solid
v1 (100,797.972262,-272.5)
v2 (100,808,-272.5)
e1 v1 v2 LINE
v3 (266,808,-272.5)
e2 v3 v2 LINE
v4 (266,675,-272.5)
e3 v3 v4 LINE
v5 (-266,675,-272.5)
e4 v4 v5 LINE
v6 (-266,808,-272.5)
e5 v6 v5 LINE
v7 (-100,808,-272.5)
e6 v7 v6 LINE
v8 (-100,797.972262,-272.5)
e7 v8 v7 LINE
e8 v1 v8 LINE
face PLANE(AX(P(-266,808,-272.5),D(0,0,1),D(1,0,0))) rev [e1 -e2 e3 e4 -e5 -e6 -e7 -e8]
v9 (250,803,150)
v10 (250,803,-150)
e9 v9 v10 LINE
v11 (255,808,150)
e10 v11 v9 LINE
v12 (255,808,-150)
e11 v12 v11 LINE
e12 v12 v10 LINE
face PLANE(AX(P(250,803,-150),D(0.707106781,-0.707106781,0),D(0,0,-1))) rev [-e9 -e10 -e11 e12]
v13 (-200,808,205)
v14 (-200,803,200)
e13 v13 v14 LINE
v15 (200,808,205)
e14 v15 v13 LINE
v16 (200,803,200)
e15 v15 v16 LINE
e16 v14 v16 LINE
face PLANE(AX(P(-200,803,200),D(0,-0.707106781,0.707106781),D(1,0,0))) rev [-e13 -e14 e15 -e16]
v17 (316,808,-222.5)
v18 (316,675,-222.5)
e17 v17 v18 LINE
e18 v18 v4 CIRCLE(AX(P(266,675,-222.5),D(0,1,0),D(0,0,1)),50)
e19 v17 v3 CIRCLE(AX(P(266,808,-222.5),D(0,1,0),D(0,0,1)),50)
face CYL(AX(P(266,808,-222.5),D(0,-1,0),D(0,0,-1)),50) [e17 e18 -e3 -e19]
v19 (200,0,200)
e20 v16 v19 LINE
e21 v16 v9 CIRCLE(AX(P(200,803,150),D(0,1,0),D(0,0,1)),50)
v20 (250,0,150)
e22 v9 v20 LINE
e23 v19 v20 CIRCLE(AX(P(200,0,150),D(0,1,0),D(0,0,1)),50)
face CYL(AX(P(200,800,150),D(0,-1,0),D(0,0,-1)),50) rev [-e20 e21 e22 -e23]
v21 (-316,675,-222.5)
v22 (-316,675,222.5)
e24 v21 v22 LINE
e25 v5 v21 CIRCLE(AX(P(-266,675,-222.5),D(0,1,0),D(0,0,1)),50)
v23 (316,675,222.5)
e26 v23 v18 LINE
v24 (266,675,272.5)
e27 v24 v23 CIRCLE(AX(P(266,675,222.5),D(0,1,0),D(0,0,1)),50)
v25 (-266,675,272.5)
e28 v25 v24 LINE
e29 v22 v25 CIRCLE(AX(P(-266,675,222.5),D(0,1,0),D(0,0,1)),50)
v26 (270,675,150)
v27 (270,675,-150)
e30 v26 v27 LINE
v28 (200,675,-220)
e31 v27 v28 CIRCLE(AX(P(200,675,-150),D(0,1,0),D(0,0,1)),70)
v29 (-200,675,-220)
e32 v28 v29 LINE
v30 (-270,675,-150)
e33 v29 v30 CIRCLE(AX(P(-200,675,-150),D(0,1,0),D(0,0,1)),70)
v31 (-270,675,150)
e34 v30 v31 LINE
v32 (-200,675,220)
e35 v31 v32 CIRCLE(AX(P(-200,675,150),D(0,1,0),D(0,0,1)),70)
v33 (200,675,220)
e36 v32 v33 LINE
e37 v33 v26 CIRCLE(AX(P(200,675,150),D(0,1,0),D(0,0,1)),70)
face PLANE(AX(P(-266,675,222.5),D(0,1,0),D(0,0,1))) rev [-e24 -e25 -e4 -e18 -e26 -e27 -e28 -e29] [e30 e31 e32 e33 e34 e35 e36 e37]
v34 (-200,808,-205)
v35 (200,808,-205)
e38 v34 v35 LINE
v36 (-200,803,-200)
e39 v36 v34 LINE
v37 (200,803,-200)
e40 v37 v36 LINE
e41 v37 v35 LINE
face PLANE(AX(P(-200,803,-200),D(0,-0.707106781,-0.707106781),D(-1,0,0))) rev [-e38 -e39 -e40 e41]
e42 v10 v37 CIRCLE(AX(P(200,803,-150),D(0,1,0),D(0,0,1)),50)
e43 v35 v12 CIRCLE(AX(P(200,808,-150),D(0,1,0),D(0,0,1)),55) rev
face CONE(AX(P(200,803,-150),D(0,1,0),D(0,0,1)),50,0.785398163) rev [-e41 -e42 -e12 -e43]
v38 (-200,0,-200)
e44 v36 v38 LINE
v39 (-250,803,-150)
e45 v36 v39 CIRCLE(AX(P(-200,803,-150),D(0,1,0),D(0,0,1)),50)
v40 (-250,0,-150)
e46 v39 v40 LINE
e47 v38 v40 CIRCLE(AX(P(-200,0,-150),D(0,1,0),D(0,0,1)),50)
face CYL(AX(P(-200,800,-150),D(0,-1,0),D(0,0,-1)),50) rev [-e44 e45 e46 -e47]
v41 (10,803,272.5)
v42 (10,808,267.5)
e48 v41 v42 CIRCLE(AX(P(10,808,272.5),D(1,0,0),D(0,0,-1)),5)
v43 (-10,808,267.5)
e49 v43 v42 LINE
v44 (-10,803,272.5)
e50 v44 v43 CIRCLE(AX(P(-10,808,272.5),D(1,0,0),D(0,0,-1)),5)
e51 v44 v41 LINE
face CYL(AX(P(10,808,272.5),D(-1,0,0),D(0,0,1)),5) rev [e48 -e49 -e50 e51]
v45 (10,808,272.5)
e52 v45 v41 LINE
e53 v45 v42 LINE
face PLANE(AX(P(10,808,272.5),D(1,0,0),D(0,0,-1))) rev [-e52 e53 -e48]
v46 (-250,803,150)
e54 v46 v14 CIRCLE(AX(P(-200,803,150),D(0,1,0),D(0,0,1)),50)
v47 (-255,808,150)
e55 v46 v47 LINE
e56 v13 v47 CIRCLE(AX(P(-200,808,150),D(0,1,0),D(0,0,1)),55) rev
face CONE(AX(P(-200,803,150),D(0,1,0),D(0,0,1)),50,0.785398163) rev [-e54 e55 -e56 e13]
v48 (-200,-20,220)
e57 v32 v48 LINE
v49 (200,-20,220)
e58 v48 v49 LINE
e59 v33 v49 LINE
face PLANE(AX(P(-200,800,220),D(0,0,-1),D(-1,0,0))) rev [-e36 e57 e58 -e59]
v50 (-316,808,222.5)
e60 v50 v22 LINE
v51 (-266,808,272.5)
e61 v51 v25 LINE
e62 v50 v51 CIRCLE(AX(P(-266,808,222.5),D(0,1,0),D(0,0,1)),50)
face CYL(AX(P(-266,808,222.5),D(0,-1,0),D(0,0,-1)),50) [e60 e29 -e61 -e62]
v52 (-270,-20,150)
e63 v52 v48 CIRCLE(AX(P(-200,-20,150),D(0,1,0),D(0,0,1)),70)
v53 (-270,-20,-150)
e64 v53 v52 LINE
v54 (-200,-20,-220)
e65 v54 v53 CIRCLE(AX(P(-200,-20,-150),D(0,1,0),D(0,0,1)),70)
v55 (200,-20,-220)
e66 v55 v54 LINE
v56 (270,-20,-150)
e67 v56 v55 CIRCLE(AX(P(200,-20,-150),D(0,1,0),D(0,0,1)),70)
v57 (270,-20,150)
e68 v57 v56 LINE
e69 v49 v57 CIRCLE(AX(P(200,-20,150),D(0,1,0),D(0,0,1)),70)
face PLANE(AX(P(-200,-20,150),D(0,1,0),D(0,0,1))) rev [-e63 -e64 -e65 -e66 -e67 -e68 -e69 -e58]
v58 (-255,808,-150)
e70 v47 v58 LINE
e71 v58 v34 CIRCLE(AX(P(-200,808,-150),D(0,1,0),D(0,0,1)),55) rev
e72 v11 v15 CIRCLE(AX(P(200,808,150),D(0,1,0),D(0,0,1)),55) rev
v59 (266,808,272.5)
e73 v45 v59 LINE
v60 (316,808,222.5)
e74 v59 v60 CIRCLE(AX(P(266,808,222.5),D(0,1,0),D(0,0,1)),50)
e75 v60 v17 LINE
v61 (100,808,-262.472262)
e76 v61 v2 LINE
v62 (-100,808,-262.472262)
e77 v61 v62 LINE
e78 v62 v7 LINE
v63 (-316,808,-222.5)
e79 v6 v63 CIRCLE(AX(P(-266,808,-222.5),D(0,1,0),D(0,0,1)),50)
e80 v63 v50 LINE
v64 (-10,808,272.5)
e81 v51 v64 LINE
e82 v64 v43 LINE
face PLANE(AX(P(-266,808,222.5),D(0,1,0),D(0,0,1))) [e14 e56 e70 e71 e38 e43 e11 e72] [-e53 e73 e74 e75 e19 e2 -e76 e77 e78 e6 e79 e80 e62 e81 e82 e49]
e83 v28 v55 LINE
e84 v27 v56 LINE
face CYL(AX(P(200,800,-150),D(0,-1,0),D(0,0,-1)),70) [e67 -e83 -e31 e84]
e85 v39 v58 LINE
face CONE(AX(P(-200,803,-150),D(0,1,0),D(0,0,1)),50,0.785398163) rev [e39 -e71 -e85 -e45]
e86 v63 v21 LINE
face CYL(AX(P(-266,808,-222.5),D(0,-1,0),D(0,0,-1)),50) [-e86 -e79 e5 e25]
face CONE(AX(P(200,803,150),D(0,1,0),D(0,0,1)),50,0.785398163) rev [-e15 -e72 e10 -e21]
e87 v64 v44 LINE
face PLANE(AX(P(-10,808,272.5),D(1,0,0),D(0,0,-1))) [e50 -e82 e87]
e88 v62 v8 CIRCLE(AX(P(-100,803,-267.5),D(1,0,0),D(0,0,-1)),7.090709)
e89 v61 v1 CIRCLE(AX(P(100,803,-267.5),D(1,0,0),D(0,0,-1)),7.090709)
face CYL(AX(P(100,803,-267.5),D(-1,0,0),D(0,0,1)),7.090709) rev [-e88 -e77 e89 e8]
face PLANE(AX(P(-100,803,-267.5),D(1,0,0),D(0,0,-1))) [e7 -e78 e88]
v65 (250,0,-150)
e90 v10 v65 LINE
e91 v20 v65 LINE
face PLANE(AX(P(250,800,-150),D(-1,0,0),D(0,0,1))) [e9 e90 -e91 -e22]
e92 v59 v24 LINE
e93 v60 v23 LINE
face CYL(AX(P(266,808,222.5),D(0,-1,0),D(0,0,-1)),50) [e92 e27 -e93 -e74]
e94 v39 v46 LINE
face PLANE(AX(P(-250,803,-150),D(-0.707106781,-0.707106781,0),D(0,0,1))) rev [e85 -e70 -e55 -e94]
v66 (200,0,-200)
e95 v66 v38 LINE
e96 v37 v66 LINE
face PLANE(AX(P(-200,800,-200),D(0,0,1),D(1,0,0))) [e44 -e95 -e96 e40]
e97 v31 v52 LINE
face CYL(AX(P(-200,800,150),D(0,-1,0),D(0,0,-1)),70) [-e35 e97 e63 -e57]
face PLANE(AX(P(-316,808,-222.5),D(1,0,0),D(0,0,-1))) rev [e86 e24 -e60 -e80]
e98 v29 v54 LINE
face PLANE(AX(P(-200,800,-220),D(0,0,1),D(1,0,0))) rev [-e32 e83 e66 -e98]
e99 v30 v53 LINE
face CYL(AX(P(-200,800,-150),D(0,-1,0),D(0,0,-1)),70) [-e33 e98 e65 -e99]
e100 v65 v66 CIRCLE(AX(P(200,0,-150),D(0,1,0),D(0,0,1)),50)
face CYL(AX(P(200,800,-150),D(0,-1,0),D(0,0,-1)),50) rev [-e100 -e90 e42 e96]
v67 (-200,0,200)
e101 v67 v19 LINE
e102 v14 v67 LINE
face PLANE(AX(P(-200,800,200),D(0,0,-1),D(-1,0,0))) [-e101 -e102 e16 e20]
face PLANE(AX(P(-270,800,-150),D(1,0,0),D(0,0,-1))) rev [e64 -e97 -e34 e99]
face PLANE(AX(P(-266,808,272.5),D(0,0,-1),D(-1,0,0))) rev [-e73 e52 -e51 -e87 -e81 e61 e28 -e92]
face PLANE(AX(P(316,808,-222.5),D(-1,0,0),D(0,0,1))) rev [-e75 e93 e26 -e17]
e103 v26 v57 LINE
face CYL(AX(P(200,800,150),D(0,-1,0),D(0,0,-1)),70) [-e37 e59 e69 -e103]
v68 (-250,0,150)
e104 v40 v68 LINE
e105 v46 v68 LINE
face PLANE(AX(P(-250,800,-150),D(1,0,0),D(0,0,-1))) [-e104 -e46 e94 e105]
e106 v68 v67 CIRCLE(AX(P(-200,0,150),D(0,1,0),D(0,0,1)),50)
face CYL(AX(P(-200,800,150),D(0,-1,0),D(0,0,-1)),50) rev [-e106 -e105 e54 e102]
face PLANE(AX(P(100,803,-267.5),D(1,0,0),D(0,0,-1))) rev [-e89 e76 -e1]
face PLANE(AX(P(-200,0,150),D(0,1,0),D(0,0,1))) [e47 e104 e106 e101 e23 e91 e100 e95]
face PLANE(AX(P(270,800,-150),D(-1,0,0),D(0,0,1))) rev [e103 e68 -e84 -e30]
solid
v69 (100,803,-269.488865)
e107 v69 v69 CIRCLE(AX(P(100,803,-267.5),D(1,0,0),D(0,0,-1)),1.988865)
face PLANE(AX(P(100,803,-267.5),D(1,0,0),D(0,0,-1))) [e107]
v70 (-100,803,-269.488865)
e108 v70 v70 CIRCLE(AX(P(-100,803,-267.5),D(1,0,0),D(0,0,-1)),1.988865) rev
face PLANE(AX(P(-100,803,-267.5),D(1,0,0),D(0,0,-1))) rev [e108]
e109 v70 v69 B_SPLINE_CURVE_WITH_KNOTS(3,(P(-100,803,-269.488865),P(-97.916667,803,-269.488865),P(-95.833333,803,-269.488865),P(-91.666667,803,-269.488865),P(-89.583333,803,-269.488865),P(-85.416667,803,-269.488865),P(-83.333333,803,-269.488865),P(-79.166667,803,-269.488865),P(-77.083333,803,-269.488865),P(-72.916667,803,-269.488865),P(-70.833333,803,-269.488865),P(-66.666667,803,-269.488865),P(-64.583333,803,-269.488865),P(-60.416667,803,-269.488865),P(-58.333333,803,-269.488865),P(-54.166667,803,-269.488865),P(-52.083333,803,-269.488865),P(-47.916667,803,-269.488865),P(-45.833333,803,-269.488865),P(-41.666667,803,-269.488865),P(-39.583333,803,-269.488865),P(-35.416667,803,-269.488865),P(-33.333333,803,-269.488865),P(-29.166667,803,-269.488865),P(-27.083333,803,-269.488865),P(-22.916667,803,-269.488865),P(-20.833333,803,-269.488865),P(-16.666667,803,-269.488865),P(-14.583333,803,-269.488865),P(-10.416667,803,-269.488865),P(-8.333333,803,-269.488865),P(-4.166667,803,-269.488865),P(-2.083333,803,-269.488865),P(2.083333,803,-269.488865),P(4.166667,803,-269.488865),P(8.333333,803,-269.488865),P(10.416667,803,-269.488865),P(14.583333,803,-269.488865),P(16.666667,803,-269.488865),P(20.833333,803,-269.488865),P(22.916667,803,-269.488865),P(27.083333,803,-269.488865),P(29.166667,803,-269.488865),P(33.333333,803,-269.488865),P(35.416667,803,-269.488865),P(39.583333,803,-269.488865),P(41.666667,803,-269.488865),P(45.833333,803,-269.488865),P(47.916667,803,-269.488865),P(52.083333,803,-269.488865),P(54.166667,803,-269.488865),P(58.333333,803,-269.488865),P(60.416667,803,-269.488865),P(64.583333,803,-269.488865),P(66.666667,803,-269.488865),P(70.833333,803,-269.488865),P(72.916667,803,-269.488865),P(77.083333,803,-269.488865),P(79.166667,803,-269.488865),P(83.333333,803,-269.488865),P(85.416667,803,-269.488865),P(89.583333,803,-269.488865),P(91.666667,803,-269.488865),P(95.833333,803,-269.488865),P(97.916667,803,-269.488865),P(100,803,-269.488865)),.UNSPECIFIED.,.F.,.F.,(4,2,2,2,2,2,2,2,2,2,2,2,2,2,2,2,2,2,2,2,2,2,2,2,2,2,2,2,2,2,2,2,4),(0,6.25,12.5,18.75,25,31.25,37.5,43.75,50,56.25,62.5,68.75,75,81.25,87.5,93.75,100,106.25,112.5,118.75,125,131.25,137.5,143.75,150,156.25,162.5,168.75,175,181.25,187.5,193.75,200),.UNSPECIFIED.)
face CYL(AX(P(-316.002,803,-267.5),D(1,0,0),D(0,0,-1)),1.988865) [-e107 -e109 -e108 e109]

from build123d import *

# Parameters (mm, degrees)
BOSS_EXTRUDE1_DEPTH             = 800
SHELL1_T                        = 20
FILLET1_R                       = 10
SKETCH2_W                       = 30
SKETCH2_H                       = 40.435969651
SKETCH2_W_2                     = 30.005971622
BOSS_EXTRUDE2_DEPTH             = 50
SKETCH3_R                       = 10
CUT_EXTRUDE1_DEPTH              = 91
SKETCH4_W                       = 55.917258457
SKETCH4_H                       = 29.702669957
BOSS_EXTRUDE3_DEPTH             = 46
SKETCH5_R                       = 7.963396182
SKETCH5_R_2                     = 2.238128569
BOSS_EXTRUDE4_DEPTH             = 105
CHAMFER1_SIZE                   = 5
BOSS_EXTRUDE5_DEPTH             = 8
BOSS_EXTRUDE5_DEPTH_BACK        = 125
CUT_EXTRUDE5_REACH              = 929.198
CUT_EXTRUDE8_DEPTH              = 100
CUT_EXTRUDE8_DEPTH_BACK         = 100
SKETCH13_R                      = 7.090708657
BOSS_EXTRUDE6_REACH             = 911.382
SKETCH15_R                      = 1.988865479
BOSS_EXTRUDE6_DIRECTION_2_REACH = 911.382
CUT_EXTRUDE9_DEPTH              = 10
CUT_EXTRUDE9_DEPTH_BACK         = 10
SKETCH16_R                      = 5
CHAMFER2_SIZE                   = 5


with BuildPart() as part:
    # Sketch1 → Boss-Extrude1 (new body)
    with BuildSketch(Plane(origin=(0, 0, 0), x_dir=(1, 0, 0), z_dir=(0, 1, 0))):
        with BuildLine():
            Line((-200, 200), (200, 200))
            ThreePointArc((200, 200), (235.355339059, 185.355339059), (250, 150))
            Line((250, 150), (250, -150))
            ThreePointArc((250, -150), (235.355339059, -185.355339059), (200, -200))
            Line((200, -200), (-200, -200))
            ThreePointArc((-200, -200), (-235.355339059, -185.355339059), (-250, -150))
            Line((-250, -150), (-250, 150))
            ThreePointArc((-250, 150), (-235.355339059, 185.355339059), (-200, 200))
        make_face()
    extrude(amount=BOSS_EXTRUDE1_DEPTH)

    # Shell1
    shell1_openings = [part.faces().sort_by_distance(p)[0] for p in [
        (0, 800, 0),
    ]]
    offset(amount=SHELL1_T, openings=shell1_openings, kind=Kind.INTERSECTION)

    # Fillet1
    # the kernel refuses this fillet: 10 mm, written as the material it takes off along each edge
    with BuildSketch(Plane(origin=(-200, 800, 150), x_dir=(0, 0, 1), z_dir=(1, 0, 0))) as fillet1_piece_1:
        with BuildLine():
            CenterArc((50 + FILLET1_R, FILLET1_R), FILLET1_R, 180, 90)
            Line((50 + FILLET1_R, 0), (50, 0))
            Line((50, 0), (50, FILLET1_R))
        make_face()
    revolve(axis=Axis((-200, 800, 150), (0, -1, 0)), revolution_arc=90, mode=Mode.SUBTRACT)
    with BuildSketch(Plane(origin=(200, 800, 200), x_dir=(0, -1, 0), z_dir=(-1, 0, 0)), Plane(origin=(-200, 800, -200), x_dir=(0, -1, 0), z_dir=(1, 0, 0))) as fillet1_piece_2:
        with BuildLine():
            CenterArc((FILLET1_R, FILLET1_R), FILLET1_R, 180, 90)
            Line((0, FILLET1_R), (0, 0))
            Line((0, 0), (FILLET1_R, 0))
        make_face()
    extrude(amount=400, mode=Mode.SUBTRACT)
    with BuildSketch(Plane(origin=(200, 800, 150), x_dir=(1, 0, 0), z_dir=(0, 0, -1))) as fillet1_piece_3:
        with BuildLine():
            CenterArc((50 + FILLET1_R, FILLET1_R), FILLET1_R, 180, 90)
            Line((50 + FILLET1_R, 0), (50, 0))
            Line((50, 0), (50, FILLET1_R))
        make_face()
    revolve(axis=Axis((200, 800, 150), (0, -1, 0)), revolution_arc=90, mode=Mode.SUBTRACT)
    with BuildSketch(Plane(origin=(250, 800, -150), x_dir=(0, -1, 0), z_dir=(0, 0, 1)), Plane(origin=(-250, 800, 150), x_dir=(0, -1, 0), z_dir=(0, 0, -1))) as fillet1_piece_4:
        with BuildLine():
            CenterArc((FILLET1_R, FILLET1_R), FILLET1_R, 180, 90)
            Line((0, FILLET1_R), (0, 0))
            Line((0, 0), (FILLET1_R, 0))
        make_face()
    extrude(amount=300, mode=Mode.SUBTRACT)
    with BuildSketch(Plane(origin=(200, 800, -150), x_dir=(0, 0, -1), z_dir=(-1, 0, 0))) as fillet1_piece_5:
        with BuildLine():
            CenterArc((50 + FILLET1_R, FILLET1_R), FILLET1_R, 180, 90)
            Line((50 + FILLET1_R, 0), (50, 0))
            Line((50, 0), (50, FILLET1_R))
        make_face()
    revolve(axis=Axis((200, 800, -150), (0, -1, 0)), revolution_arc=90, mode=Mode.SUBTRACT)
    with BuildSketch(Plane(origin=(-200, 800, -150), x_dir=(-1, 0, 0), z_dir=(0, 0, 1))) as fillet1_piece_6:
        with BuildLine():
            CenterArc((50 + FILLET1_R, FILLET1_R), FILLET1_R, 180, 90)
            Line((50 + FILLET1_R, 0), (50, 0))
            Line((50, 0), (50, FILLET1_R))
        make_face()
    revolve(axis=Axis((-200, 800, -150), (0, -1, 0)), revolution_arc=90, mode=Mode.SUBTRACT)

    # Sketch2 → Boss-Extrude2 (add)
    with BuildSketch(Plane(origin=(0, 0, -220), x_dir=(-1, 0, 0), z_dir=(0, 0, -1))):
        with Locations((-30.002985811, 779.782015174)):
            Rectangle(SKETCH2_W, SKETCH2_H)
        with Locations((30, 779.782015174)):
            Rectangle(SKETCH2_W_2, SKETCH2_H)
    extrude(amount=BOSS_EXTRUDE2_DEPTH)

    # Sketch3 → Cut-Extrude1 (cut)
    with BuildSketch(Plane(origin=(45.002985811, 0, 0), x_dir=(0, 0, -1), z_dir=(1, 0, 0))):
        with Locations((245, 779.782015175)):
            Circle(SKETCH3_R)
        with BuildLine():
            Line((245, 800), (270, 800))
            Line((270, 800), (270, 759.564030349))
            Line((270, 759.564030349), (245, 759.564030349))
            ThreePointArc((245, 759.564030349), (265.217984825, 779.782015175), (245, 800))
        make_face()
    extrude(amount=-CUT_EXTRUDE1_DEPTH, mode=Mode.SUBTRACT)

    # Sketch4 → Boss-Extrude3 (add)
    with BuildSketch(Plane(origin=(0, 0, -220), x_dir=(-1, 0, 0), z_dir=(0, 0, -1))):
        with Locations((-87.655186212, 779.782015174)):
            Rectangle(SKETCH4_W, SKETCH4_H)
    extrude(amount=BOSS_EXTRUDE3_DEPTH)

    # Sketch5 → Boss-Extrude4 (add)
    with BuildSketch(Plane.ZY.offset(-59.696556983)):
        with Locations(Location((-245, 779.782015175, 0), (0, 0, 180))):
            Circle(SKETCH5_R)
        with Locations((-245, 779.782015175)):
            Circle(SKETCH5_R_2, mode=Mode.SUBTRACT)
    extrude(amount=BOSS_EXTRUDE4_DEPTH)

    # Chamfer1
    chamfer1_edges = [part.edges().sort_by_distance(p)[0] for p in [
        (87.655186211, 794.633350153, -266),
        (87.655186211, 764.930680196, -266),
    ]]
    chamfer(chamfer1_edges, length=CHAMFER1_SIZE)

    # Sketch8 → Boss-Extrude5 (add, two sides: drawn at the far end of the back side and taken through both)
    with BuildSketch(Plane(origin=(0, 800, 0), x_dir=(1, 0, 0), z_dir=(0, 1, 0)).offset(-BOSS_EXTRUDE5_DEPTH_BACK)):
        with BuildLine():
            Line((-266, 272.5), (266, 272.5))
            ThreePointArc((266, 272.5), (301.355339059, 257.855339059), (316, 222.5))
            Line((316, 222.5), (316, -222.5))
            ThreePointArc((316, -222.5), (301.355339059, -257.855339059), (266, -272.5))
            Line((266, -272.5), (-266, -272.5))
            ThreePointArc((-266, -272.5), (-301.355339059, -257.855339059), (-316, -222.5))
            Line((-316, -222.5), (-316, 222.5))
            ThreePointArc((-316, 222.5), (-301.355339059, 257.855339059), (-266, 272.5))
        make_face()
    extrude(amount=BOSS_EXTRUDE5_DEPTH + BOSS_EXTRUDE5_DEPTH_BACK)

    # Sketch11 → Cut-Extrude5 (cut, up to next)
    with BuildSketch(Plane(origin=(0, 808, 0), x_dir=(1, 0, 0), z_dir=(0, 1, 0)), mode=Mode.PRIVATE) as cut_extrude5_sk1:
        with BuildLine():
            Line((-200, -200), (200, -200))
            ThreePointArc((200, -200), (235.355339059, -185.355339059), (250, -150))
            Line((250, -150), (250, 150))
            ThreePointArc((250, 150), (235.355339059, 185.355339059), (200, 200))
            Line((200, 200), (-200, 200))
            ThreePointArc((-200, 200), (-235.355339059, 185.355339059), (-250, 150))
            Line((-250, 150), (-250, -150))
            ThreePointArc((-250, -150), (-235.355339059, -185.355339059), (-200, -200))
        make_face()
    cut_extrude5_tool1 = extrude(cut_extrude5_sk1.sketch, amount=-CUT_EXTRUDE5_REACH, mode=Mode.PRIVATE) & part.part
    add(cut_extrude5_tool1.solids().sort_by_distance((0, 808, 0))[0], mode=Mode.SUBTRACT)

    # Sketch13 → Cut-Extrude8 (cut, two sides: drawn at the far end of the back side and taken through both)
    with BuildSketch(Plane(origin=(0, 0, 0), x_dir=(0, 0, -1), z_dir=(1, 0, 0)).offset(-CUT_EXTRUDE8_DEPTH_BACK)):
        with Locations((267.5, 803)):
            Circle(SKETCH13_R)
    extrude(amount=CUT_EXTRUDE8_DEPTH + CUT_EXTRUDE8_DEPTH_BACK, mode=Mode.SUBTRACT)


with BuildPart() as body_2:

    # Sketch15 → Boss-Extrude6 (new, up to next)
    with BuildSketch(Plane(origin=(0, 0, 0), x_dir=(0, 0, -1), z_dir=(1, 0, 0)), mode=Mode.PRIVATE) as boss_extrude6_sk1:
        with Locations((267.5, 803)):
            Circle(SKETCH15_R)
    boss_extrude6_tool1 = extrude(boss_extrude6_sk1.sketch, amount=BOSS_EXTRUDE6_REACH, mode=Mode.PRIVATE) - part.part
    add(boss_extrude6_tool1.solids().sort_by_distance((0, 803, -267.5))[0])


    # Sketch15 → Boss-Extrude6 direction 2 (add, up to next)
    with BuildSketch(Plane(origin=(0, 0, 0), x_dir=(0, 0, -1), z_dir=(1, 0, 0)), mode=Mode.PRIVATE) as boss_extrude6_direction_2_sk1:
        with Locations((267.5, 803)):
            Circle(SKETCH15_R)
    boss_extrude6_direction_2_tool1 = extrude(boss_extrude6_direction_2_sk1.sketch, amount=-BOSS_EXTRUDE6_DIRECTION_2_REACH, mode=Mode.PRIVATE) - part.part
    add(boss_extrude6_direction_2_tool1.solids().sort_by_distance((0, 803, -267.5))[0])


with BuildPart() as part_1:
    add(part.part)

    # Sketch16 → Cut-Extrude9 (cut, two sides: drawn at the far end of the back side and taken through both)
    with BuildSketch(Plane(origin=(0, 0, 0), x_dir=(0, 0, -1), z_dir=(1, 0, 0)).offset(-CUT_EXTRUDE9_DEPTH_BACK)):
        with Locations((-272.5, 808)):
            Circle(SKETCH16_R)
    extrude(amount=CUT_EXTRUDE9_DEPTH + CUT_EXTRUDE9_DEPTH_BACK, mode=Mode.SUBTRACT)

    # Chamfer2
    chamfer2_edges = [part_1.edges().sort_by_distance(p)[0] for p in [
        (-235.355339059, 808, -185.355339059),
        (-250, 808, 0),
        (-235.355339059, 808, 185.355339059),
        (0, 808, 200),
        (235.355339059, 808, 185.355339059),
        (250, 808, 0),
        (235.355339059, 808, -185.355339059),
        (0, 808, -200),
    ]]
    chamfer(chamfer2_edges, length=CHAMFER2_SIZE)


solid = Compound([body_2.part, part_1.part])
